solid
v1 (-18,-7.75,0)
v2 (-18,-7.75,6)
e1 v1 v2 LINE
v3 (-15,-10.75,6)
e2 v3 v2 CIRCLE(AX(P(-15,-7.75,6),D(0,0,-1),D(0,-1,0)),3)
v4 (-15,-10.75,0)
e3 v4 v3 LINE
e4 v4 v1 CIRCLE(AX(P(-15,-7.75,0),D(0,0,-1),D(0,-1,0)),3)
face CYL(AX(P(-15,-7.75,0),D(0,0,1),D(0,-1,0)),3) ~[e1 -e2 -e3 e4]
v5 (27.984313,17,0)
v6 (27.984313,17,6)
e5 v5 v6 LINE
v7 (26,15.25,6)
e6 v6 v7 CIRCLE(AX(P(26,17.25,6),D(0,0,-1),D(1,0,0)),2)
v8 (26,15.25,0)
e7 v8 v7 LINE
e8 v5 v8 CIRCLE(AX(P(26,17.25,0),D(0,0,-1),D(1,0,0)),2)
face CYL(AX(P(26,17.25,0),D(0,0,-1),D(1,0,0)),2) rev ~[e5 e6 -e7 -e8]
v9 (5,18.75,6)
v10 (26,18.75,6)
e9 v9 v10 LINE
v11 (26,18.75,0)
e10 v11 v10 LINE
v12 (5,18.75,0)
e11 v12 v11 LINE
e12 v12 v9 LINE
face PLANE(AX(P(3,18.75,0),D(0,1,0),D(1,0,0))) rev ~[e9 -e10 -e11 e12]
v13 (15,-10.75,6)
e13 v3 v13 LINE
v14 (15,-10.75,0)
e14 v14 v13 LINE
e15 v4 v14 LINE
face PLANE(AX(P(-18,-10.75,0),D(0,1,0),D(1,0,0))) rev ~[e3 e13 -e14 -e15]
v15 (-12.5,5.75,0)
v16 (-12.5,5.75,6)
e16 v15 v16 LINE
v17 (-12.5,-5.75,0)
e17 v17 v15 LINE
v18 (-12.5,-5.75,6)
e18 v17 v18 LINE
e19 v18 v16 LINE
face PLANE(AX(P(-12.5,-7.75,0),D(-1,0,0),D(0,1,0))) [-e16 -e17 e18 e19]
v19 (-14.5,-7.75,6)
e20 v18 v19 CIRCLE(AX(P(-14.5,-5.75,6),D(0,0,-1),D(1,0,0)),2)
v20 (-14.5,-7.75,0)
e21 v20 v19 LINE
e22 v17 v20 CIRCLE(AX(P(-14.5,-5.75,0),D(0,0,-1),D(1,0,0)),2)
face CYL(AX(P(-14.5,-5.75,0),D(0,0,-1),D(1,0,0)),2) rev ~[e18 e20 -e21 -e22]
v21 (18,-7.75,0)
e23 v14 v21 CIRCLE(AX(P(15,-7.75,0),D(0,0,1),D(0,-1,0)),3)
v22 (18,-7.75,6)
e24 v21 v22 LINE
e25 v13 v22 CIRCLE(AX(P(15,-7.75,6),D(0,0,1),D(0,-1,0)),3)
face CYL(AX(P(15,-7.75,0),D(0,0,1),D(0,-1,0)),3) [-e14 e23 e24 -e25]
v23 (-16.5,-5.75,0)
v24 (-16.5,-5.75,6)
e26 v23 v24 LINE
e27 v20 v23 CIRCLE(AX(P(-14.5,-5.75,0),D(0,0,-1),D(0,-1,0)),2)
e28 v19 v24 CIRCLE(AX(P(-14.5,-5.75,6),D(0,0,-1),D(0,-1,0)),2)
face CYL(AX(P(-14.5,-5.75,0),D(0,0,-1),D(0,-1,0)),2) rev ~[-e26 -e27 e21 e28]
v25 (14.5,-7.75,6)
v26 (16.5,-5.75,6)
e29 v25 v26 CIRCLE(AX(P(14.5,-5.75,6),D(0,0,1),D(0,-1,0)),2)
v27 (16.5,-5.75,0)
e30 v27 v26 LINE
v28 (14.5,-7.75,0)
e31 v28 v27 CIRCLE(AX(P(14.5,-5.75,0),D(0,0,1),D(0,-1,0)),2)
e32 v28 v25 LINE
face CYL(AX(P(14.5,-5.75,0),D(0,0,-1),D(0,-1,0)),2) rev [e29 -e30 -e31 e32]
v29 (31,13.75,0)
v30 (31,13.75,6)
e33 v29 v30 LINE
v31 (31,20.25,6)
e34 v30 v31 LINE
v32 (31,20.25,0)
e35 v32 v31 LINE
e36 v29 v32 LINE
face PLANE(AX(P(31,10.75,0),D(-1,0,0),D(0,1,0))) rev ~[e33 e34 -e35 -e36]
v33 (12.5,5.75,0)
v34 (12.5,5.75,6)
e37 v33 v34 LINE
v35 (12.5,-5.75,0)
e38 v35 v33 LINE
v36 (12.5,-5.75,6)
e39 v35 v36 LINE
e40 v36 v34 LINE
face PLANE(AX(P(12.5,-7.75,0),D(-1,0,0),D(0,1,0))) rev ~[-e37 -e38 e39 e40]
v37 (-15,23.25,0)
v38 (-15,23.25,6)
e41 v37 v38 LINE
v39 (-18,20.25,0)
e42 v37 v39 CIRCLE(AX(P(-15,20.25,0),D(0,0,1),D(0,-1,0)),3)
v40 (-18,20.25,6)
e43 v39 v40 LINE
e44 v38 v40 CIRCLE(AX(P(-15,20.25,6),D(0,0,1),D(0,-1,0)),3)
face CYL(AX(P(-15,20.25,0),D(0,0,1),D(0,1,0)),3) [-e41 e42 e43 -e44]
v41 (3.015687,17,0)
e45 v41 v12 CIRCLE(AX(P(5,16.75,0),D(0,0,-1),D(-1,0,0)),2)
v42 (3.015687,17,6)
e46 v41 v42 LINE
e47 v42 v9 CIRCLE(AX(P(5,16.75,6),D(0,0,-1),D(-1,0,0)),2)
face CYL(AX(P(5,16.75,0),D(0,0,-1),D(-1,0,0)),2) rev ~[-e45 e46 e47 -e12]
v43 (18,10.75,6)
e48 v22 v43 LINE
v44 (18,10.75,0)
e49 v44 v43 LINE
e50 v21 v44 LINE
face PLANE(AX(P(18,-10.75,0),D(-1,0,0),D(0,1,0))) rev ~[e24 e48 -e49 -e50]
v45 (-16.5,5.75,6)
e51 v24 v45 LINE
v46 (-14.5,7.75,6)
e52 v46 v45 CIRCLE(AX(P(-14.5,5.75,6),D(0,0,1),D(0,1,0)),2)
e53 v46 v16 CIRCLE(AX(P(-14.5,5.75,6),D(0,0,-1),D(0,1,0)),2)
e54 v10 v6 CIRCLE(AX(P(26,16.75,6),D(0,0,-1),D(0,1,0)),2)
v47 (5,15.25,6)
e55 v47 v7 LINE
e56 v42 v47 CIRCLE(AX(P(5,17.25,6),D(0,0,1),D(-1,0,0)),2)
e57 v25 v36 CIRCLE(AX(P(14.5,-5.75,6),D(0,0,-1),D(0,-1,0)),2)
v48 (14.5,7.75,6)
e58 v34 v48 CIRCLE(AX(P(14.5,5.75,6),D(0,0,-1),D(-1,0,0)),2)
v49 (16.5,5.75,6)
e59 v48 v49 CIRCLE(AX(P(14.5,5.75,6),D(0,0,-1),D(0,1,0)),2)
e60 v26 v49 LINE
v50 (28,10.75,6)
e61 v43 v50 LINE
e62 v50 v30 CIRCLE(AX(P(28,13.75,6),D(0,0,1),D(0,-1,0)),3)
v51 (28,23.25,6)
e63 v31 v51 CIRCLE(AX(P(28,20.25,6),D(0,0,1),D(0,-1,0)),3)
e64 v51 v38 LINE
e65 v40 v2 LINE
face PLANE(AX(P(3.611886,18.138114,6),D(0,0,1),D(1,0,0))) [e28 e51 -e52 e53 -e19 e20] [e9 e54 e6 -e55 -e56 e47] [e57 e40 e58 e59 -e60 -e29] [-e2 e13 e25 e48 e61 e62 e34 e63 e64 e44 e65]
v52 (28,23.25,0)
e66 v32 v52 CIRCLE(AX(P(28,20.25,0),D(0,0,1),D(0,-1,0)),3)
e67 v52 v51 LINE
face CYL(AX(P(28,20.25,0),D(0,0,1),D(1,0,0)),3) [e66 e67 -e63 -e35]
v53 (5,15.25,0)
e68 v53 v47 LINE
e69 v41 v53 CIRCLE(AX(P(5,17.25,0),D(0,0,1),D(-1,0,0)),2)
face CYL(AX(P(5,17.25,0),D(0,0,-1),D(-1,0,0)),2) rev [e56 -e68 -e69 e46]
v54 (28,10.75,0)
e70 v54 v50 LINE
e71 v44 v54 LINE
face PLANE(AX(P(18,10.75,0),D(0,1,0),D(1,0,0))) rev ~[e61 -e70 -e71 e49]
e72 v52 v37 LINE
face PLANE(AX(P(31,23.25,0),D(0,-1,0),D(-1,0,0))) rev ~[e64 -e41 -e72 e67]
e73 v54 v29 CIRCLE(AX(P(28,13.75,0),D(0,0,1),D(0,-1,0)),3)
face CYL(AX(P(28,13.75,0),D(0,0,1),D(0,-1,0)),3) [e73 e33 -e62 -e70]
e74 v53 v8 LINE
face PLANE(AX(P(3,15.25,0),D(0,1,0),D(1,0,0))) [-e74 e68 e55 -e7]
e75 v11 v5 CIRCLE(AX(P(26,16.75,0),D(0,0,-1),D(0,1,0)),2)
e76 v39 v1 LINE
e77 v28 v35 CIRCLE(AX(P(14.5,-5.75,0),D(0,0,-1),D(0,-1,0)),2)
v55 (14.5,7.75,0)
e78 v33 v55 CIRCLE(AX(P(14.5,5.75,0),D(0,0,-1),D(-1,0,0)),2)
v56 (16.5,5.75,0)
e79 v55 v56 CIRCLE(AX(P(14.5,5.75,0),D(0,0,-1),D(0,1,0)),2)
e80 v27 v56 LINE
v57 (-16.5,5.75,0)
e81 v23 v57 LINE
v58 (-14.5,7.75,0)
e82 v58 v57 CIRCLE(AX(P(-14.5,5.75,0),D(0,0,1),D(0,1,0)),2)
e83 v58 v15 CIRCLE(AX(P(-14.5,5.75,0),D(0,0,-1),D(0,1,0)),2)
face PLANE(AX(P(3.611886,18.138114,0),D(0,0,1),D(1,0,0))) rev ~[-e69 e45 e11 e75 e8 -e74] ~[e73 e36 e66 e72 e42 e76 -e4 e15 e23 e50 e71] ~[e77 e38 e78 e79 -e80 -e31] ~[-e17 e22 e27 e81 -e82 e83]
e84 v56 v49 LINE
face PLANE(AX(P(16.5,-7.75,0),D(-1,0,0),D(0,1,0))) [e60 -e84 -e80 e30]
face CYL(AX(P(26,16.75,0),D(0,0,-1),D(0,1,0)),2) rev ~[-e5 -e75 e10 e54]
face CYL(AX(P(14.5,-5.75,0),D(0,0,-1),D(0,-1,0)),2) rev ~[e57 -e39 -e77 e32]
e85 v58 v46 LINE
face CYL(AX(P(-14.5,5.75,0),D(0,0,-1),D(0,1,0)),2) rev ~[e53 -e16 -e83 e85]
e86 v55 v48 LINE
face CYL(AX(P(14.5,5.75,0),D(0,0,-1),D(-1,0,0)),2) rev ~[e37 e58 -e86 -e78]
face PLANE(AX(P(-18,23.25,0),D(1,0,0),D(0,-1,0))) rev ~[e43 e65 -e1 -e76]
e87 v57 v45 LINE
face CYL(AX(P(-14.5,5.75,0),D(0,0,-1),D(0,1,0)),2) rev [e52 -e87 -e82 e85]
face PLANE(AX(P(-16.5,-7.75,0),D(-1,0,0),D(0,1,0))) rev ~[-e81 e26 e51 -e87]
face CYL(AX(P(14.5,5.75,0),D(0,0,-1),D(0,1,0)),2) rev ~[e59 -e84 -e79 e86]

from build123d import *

# Parameters (mm, degrees)
F0_W        = 36
F0_H        = 21.5
F0_R        = 1.625
F0_W_2      = 4
F0_H_2      = 15.5
F0_W_3      = 25
F0_H_3      = 3.5
F1_DEPTH    = 6
F2_T1_DEPTH = 6
F3_R        = 3


# Not quite as in the source:
# - a fillet or chamfer that OpenCascade refuses, or shapes differently, is made with other operations: its cross-section is extruded or revolved along the edge and cut away or added


with BuildPart() as f1:
    # F0 (on Top) → F1 (new body)
    with BuildSketch(Plane.XY):
        Rectangle(F0_W, F0_H)
        with Locations((-4.0289468229, -6.686462095)):
            Circle(F0_R, mode=Mode.SUBTRACT)
        with Locations((4.0289468229, -6.686462095)):
            Circle(F0_R, mode=Mode.SUBTRACT)
        with Locations((-14.5, 0)):
            Rectangle(F0_W_2, F0_H_2, mode=Mode.SUBTRACT)
        with Locations((14.5, 0)):
            Rectangle(F0_W_2, F0_H_2, mode=Mode.SUBTRACT)
        Polygon((-18, 10.75), (18, 10.75), (31, 10.75), (31, 23.25), (-18, 23.25), align=None)
        with Locations((15.5, 17)):
            Rectangle(F0_W_3, F0_H_3, mode=Mode.SUBTRACT)
        with Locations((-4.0289468229, -6.686462095)):
            Circle(F0_R)
        with Locations((4.0289468229, -6.686462095)):
            Circle(F0_R)
    extrude(amount=F1_DEPTH)

    # F2: fillet of radius 2 on 12 edges, made by hand

    # F2_s2 → F2_t1 (join)
    with BuildSketch(Plane.XY):
        with BuildLine():
            ThreePointArc((3, 16.75), (3.5857864376, 18.1642135624), (5, 18.75))
            Line((5, 18.75), (3, 18.75))
            Line((3, 18.75), (3, 16.75))
        make_face()
        with BuildLine():
            ThreePointArc((26, 18.75), (27.4142135624, 18.1642135624), (28, 16.75))
            Line((28, 16.75), (28, 18.75))
            Line((28, 18.75), (26, 18.75))
        make_face()
        with BuildLine():
            ThreePointArc((28, 17.25), (27.4142135624, 15.8357864376), (26, 15.25))
            Line((26, 15.25), (28, 15.25))
            Line((28, 15.25), (28, 17.25))
        make_face()
        with BuildLine():
            ThreePointArc((3, 17.25), (3.5857864376, 15.8357864376), (5, 15.25))
            Line((5, 15.25), (3, 15.25))
            Line((3, 15.25), (3, 17.25))
        make_face()
        with BuildLine():
            ThreePointArc((-14.5, -7.75), (-15.9142135624, -7.1642135624), (-16.5, -5.75))
            Line((-16.5, -5.75), (-16.5, -7.75))
            Line((-16.5, -7.75), (-14.5, -7.75))
        make_face()
        with BuildLine():
            ThreePointArc((14.5, -7.75), (13.0857864376, -7.1642135624), (12.5, -5.75))
            Line((12.5, -5.75), (12.5, -7.75))
            Line((12.5, -7.75), (14.5, -7.75))
        make_face()
        with BuildLine():
            ThreePointArc((14.5, -7.75), (15.9142135624, -7.1642135624), (16.5, -5.75))
            Line((16.5, -5.75), (16.5, -7.75))
            Line((16.5, -7.75), (14.5, -7.75))
        make_face()
        with BuildLine():
            ThreePointArc((-12.5, -5.75), (-13.0857864376, -7.1642135624), (-14.5, -7.75))
            Line((-14.5, -7.75), (-12.5, -7.75))
            Line((-12.5, -7.75), (-12.5, -5.75))
        make_face()
        with BuildLine():
            ThreePointArc((-14.5, 7.75), (-13.0857864376, 7.1642135624), (-12.5, 5.75))
            Line((-12.5, 5.75), (-12.5, 7.75))
            Line((-12.5, 7.75), (-14.5, 7.75))
        make_face()
        with BuildLine():
            ThreePointArc((-14.5, 7.75), (-15.9142135624, 7.1642135624), (-16.5, 5.75))
            Line((-16.5, 5.75), (-16.5, 7.75))
            Line((-16.5, 7.75), (-14.5, 7.75))
        make_face()
        with BuildLine():
            ThreePointArc((12.5, 5.75), (13.0857864376, 7.1642135624), (14.5, 7.75))
            Line((14.5, 7.75), (12.5, 7.75))
            Line((12.5, 7.75), (12.5, 5.75))
        make_face()
        with BuildLine():
            ThreePointArc((14.5, 7.75), (15.9142135624, 7.1642135624), (16.5, 5.75))
            Line((16.5, 5.75), (16.5, 7.75))
            Line((16.5, 7.75), (14.5, 7.75))
        make_face()
    extrude(amount=F2_T1_DEPTH)

    # F3
    f3_edges = [f1.edges().sort_by_distance(p)[0] for p in [
        (31, 10.75, 3),
        (31, 23.25, 3),
        (-18, 23.25, 3),
        (-18, -10.75, 3),
        (18, -10.75, 3),
    ]]
    fillet(f3_edges, radius=F3_R)


solid = f1.part
